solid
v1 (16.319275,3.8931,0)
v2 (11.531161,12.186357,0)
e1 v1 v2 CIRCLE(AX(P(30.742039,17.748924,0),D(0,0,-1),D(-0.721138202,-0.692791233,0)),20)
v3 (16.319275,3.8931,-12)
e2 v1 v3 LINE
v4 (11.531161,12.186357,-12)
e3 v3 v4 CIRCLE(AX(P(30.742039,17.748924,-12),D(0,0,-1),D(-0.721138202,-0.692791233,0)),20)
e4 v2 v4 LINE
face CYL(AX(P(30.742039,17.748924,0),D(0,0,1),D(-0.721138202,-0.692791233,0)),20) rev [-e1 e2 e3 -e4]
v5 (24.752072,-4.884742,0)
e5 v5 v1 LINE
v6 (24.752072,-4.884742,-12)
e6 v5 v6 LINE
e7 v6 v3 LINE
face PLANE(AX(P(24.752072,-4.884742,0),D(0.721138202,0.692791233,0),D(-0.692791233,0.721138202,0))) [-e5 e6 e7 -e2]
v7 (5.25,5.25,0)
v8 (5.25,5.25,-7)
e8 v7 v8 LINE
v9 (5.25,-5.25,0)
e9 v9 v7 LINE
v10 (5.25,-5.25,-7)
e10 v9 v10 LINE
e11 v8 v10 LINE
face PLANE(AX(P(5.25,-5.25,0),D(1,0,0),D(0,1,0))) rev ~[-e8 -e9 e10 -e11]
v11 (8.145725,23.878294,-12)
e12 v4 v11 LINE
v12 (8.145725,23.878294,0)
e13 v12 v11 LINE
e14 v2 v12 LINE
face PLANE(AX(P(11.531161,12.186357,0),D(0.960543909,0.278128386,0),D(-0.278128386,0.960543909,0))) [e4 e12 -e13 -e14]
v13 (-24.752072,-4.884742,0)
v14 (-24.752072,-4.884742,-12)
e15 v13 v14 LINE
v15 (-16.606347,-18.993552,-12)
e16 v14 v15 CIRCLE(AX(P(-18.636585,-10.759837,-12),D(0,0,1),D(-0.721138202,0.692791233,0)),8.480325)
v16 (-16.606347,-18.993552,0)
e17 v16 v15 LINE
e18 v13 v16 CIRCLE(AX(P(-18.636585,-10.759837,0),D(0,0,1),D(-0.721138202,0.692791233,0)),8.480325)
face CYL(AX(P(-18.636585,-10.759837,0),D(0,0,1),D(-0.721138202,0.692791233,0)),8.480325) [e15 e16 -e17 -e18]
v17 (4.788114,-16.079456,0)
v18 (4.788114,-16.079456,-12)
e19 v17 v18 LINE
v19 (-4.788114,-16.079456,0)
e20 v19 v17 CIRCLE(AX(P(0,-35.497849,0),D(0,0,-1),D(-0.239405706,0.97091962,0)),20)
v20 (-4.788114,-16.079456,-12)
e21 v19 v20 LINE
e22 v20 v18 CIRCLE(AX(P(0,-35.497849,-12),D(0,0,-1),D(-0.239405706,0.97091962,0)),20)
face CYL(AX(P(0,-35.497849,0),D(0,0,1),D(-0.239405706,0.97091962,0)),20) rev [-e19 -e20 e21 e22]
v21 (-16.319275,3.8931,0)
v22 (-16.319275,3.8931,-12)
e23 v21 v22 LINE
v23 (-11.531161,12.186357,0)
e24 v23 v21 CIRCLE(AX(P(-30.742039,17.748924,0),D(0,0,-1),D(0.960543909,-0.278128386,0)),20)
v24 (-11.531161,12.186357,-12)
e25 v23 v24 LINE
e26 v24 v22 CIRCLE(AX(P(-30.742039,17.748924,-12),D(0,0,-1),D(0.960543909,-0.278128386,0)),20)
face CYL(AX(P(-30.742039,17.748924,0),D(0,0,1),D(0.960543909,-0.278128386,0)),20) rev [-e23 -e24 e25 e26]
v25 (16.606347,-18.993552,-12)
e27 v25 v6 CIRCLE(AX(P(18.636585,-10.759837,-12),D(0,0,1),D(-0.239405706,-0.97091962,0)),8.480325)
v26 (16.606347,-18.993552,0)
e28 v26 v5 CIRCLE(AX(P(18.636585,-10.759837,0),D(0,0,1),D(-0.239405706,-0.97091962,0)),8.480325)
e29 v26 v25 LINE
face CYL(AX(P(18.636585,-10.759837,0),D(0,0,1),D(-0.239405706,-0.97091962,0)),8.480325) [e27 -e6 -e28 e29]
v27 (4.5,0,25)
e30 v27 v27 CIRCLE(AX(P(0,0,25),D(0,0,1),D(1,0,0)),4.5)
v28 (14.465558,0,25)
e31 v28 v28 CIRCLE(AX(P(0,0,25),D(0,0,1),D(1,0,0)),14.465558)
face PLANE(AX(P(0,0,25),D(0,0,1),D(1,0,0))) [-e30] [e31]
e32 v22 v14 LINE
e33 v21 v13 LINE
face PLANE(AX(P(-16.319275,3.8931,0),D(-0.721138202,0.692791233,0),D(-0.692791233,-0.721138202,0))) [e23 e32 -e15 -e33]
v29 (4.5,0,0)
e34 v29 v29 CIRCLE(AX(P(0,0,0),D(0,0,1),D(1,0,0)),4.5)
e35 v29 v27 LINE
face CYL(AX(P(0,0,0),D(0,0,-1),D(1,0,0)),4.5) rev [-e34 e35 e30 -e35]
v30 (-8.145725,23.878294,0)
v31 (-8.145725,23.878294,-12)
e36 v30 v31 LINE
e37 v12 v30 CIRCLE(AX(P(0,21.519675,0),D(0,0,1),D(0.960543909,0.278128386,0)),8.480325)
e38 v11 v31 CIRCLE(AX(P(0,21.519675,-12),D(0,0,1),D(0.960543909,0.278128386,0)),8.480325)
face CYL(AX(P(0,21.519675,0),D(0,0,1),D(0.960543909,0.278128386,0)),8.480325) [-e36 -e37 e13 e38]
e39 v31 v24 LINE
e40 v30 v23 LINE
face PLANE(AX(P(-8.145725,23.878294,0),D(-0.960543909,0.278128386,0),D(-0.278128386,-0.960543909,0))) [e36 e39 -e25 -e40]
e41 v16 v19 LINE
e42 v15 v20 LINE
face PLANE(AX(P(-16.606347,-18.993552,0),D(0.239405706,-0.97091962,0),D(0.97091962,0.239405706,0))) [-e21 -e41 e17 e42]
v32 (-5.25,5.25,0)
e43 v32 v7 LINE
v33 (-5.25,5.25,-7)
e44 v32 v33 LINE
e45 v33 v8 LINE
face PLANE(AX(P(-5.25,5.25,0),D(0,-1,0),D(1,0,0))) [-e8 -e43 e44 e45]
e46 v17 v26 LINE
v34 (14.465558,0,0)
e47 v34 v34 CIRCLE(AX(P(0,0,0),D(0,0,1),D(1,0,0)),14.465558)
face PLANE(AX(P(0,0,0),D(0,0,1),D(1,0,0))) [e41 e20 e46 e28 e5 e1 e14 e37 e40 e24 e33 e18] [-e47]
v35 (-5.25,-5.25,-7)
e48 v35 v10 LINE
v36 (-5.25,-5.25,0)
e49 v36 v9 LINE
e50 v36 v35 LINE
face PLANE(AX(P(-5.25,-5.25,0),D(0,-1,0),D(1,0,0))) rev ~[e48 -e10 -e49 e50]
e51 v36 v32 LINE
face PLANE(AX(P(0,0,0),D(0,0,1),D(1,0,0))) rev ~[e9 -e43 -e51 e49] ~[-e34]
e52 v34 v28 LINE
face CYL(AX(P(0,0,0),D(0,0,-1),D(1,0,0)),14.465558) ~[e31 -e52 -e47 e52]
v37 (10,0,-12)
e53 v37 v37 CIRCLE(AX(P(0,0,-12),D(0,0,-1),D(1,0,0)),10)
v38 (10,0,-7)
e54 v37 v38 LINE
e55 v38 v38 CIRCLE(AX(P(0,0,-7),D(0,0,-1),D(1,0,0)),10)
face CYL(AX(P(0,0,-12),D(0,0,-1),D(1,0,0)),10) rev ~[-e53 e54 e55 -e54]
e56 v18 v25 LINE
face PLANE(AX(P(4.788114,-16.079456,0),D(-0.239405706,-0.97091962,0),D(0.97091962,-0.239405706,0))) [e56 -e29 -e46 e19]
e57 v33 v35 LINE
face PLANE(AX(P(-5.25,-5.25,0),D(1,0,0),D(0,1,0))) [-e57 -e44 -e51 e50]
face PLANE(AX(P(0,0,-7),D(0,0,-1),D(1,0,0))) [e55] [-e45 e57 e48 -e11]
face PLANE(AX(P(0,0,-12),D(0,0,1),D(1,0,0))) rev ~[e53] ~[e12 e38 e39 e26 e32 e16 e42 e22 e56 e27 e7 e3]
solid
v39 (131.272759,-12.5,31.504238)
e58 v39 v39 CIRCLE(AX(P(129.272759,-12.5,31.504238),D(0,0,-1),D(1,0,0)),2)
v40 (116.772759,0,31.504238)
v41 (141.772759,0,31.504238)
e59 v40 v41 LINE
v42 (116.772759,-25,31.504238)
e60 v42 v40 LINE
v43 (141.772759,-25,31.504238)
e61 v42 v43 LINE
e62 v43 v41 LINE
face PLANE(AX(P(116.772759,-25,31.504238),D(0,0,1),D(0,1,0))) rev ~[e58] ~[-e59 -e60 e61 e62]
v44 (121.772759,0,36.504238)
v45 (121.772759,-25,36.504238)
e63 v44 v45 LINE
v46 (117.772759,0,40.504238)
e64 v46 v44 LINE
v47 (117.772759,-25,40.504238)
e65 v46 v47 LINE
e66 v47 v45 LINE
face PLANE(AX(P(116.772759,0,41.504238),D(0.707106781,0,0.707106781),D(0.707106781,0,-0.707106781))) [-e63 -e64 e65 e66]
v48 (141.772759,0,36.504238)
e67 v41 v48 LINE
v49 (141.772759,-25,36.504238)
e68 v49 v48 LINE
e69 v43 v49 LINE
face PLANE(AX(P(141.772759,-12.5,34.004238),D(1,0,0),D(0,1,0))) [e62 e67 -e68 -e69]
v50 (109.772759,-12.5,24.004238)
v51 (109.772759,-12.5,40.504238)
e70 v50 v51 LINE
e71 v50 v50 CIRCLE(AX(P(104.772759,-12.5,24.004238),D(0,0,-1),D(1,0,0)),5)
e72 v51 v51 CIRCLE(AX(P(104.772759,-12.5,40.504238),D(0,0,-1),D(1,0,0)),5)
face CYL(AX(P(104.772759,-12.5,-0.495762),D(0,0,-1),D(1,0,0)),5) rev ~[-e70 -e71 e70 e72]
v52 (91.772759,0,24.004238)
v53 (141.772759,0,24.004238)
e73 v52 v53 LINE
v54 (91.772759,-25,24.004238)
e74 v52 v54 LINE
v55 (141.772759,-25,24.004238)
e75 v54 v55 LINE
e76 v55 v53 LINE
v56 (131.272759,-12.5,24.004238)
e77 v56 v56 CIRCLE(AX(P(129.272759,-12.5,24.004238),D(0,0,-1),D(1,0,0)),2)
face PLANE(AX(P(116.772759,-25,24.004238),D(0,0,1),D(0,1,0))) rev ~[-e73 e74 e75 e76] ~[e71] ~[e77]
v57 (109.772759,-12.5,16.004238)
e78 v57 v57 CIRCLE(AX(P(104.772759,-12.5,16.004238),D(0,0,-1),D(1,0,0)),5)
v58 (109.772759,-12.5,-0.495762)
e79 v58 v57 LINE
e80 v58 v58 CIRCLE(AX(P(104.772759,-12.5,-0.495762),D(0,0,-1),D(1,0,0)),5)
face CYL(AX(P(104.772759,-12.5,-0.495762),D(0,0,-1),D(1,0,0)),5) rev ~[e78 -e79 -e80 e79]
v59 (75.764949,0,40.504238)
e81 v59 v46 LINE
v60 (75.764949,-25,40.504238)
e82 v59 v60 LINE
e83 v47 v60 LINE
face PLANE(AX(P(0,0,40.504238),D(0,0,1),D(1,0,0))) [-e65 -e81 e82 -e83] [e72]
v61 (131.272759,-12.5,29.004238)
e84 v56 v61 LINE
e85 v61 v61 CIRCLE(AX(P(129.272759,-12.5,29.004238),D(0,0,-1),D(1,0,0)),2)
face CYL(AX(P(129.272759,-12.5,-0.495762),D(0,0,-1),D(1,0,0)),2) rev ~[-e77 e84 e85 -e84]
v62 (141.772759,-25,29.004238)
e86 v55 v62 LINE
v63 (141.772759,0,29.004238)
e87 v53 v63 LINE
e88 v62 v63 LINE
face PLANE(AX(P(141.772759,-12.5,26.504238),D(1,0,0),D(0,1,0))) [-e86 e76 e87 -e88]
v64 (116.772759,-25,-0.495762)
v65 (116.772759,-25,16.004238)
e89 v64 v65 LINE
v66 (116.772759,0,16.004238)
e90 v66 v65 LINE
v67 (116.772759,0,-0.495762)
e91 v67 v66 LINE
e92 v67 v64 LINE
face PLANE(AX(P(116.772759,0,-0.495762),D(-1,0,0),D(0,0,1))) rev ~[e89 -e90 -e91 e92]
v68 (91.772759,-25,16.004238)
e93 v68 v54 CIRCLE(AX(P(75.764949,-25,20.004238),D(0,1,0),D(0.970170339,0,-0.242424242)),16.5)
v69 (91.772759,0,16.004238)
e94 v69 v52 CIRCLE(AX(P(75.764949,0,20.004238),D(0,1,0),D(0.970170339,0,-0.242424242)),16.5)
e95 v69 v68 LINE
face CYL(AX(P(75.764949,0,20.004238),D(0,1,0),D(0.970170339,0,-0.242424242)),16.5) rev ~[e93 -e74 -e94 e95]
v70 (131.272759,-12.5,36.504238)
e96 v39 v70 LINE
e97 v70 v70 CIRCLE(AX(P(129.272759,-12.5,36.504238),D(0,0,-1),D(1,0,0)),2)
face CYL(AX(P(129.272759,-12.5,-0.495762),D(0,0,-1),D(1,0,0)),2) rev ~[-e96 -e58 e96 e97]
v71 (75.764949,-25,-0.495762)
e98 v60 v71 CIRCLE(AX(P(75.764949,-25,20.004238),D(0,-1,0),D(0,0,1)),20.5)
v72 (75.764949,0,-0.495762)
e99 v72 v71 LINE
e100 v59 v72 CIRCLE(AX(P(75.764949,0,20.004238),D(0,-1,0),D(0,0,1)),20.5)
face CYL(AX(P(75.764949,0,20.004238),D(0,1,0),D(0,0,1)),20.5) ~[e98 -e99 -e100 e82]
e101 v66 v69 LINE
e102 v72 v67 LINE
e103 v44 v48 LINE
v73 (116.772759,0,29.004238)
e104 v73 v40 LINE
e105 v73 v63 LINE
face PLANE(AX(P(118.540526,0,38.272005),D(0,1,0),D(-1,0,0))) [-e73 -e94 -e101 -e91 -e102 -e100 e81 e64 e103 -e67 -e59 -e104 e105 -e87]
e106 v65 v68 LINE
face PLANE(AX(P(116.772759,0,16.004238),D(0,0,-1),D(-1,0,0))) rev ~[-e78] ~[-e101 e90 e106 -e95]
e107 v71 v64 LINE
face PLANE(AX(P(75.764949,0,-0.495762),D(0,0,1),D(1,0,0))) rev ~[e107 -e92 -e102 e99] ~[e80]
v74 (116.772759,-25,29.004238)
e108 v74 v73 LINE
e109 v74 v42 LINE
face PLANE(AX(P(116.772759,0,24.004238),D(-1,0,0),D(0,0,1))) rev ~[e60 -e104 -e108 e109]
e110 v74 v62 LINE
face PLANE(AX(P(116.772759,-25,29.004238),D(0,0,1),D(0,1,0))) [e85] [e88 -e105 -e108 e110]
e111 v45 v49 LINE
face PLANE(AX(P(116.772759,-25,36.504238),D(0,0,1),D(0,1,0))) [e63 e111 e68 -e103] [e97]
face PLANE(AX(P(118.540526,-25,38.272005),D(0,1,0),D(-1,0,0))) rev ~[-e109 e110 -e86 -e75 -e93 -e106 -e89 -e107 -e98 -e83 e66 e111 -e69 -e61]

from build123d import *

# Parameters (mm, degrees)
F0_R        = 14.4655577075
F0_W        = 10.5
F0_H        = 10.5
F1_DEPTH    = 12
F0_R_2      = 4.5
F2_DEPTH    = 25
F3_R        = 10
F3_W        = 10.5
F3_H        = 10.5
F4_DEPTH    = 5
F6_DEPTH    = 25
F7_W        = 25
F7_H        = 5
F8_DEPTH    = 25
F9_T4_DEPTH = 25
F10_R       = 5
F10_R_2     = 2
F11_DEPTH   = 41.001


# Not quite as in the source:
# - a fillet or chamfer that OpenCascade refuses, or shapes differently, is made with other operations: its cross-section is extruded or revolved along the edge and cut away or added


with BuildPart() as f1:
    # F0 (on Top) → F1 (new body)
    with BuildSketch(Plane.XY):
        with BuildLine():
            Line((11.5311605337, 12.1863566004), (8.1457248267, 23.8782938791))
            ThreePointArc((8.1457248267, 23.8782938791), (0, 30), (-8.1457248267, 23.8782938791))
            Line((-8.1457248267, 23.8782938791), (-11.5311605337, 12.1863566004))
            ThreePointArc((-11.5311605337, 12.1863566004), (-13.4215306345, 7.7489243248), (-16.3192746623, 3.8930996571))
            Line((-16.3192746623, 3.8930996571), (-24.7520715117, -4.8847423074))
            ThreePointArc((-24.7520715117, -4.8847423074), (-25.9807621135, -15), (-16.606346685, -18.9935515717))
            Line((-16.606346685, -18.9935515717), (-4.7881141286, -16.0794562575))
            ThreePointArc((-4.7881141286, -16.0794562575), (0, -15.4978486495), (4.7881141286, -16.0794562575))
            Line((4.7881141286, -16.0794562575), (16.606346685, -18.9935515717))
            ThreePointArc((16.606346685, -18.9935515717), (25.9807621135, -15), (24.7520715117, -4.8847423074))
            Line((24.7520715117, -4.8847423074), (16.3192746623, 3.8930996571))
            ThreePointArc((16.3192746623, 3.8930996571), (13.4215306345, 7.7489243248), (11.5311605337, 12.1863566004))
        make_face()
        Circle(F0_R, mode=Mode.SUBTRACT)
        Circle(F0_R)
        Rectangle(F0_W, F0_H, mode=Mode.SUBTRACT)
    extrude(amount=-F1_DEPTH)

    # F0 (on Top) → F2 (join)
    with BuildSketch(Plane.XY):
        Circle(F0_R)
        Rectangle(F0_W, F0_H, mode=Mode.SUBTRACT)
        Rectangle(F0_W, F0_H)
        Circle(F0_R_2, mode=Mode.SUBTRACT)
    extrude(amount=F2_DEPTH)

    # F3 (on face) → F4 (cut)
    with BuildSketch(Plane(origin=(0, 0, -12), x_dir=(1, 0, 0), z_dir=(0, 0, -1))):
        Circle(F3_R)
        Rectangle(F3_W, F3_H, mode=Mode.SUBTRACT)
    extrude(amount=-F4_DEPTH, mode=Mode.SUBTRACT)


with BuildPart() as f6:
    # F5 (on Front) → F6 (new body)
    with BuildSketch(Plane.XZ):
        with BuildLine():
            ThreePointArc((91.7727594808, 16.0042379603), (59.2649488872, 20.0042379603), (91.7727594808, 24.0042379603))
            Line((91.7727594808, 24.0042379603), (116.7727594808, 24.0042379603))
            Line((116.7727594808, 24.0042379603), (116.7727594808, 40.5042379603))
            Line((116.7727594808, 40.5042379603), (75.7649488872, 40.5042379603))
            ThreePointArc((75.7649488872, 40.5042379603), (55.2649488872, 20.0042379603), (75.7649488872, -0.4957620397))
            Line((75.7649488872, -0.4957620397), (116.7727594808, -0.4957620397))
            Line((116.7727594808, -0.4957620397), (116.7727594808, 16.0042379603))
            Line((116.7727594808, 16.0042379603), (91.7727594808, 16.0042379603))
        make_face()
    extrude(amount=F6_DEPTH)

    # F7 (on face) → F8 (join)
    with BuildSketch(Plane.YZ.offset(116.7727594808)):
        with Locations((-12.5, 26.5042379603)):
            Rectangle(F7_W, F7_H)
        with Locations((-12.5, 34.0042379603)):
            Rectangle(F7_W, F7_H)
    extrude(amount=F8_DEPTH)

    # F9: chamfer of 5 on 1 edges, made by hand


with BuildPart() as f9_tool2:
    # F9_s3 → F9_t4 (new body)
    with BuildSketch(Plane.XZ):
        Polygon((116.7727594808, 41.5042379603), (121.7727594808, 36.5042379603), (116.7727594808, 36.5042379603), align=None)
    extrude(amount=F9_T4_DEPTH)

    split(bisect_by=Plane.XY.offset(40.5042379603), keep=Keep.BOTTOM)


with BuildPart() as f6_1:
    add(f6.part)

    # F9_t1: union F9_tool2
    add(f9_tool2.part)

    # F10 (on face) → F11 (cut, through all)
    with BuildSketch(Plane(origin=(0, 0, -0.4957620397), x_dir=(1, 0, 0), z_dir=(0, 0, -1))):
        with Locations((104.7727594808, 12.5)):
            Circle(F10_R)
        with Locations((129.2727594808, 12.5)):
            Circle(F10_R_2)
    extrude(amount=-F11_DEPTH, mode=Mode.SUBTRACT)


solid = Compound([f1.part, f6_1.part])
